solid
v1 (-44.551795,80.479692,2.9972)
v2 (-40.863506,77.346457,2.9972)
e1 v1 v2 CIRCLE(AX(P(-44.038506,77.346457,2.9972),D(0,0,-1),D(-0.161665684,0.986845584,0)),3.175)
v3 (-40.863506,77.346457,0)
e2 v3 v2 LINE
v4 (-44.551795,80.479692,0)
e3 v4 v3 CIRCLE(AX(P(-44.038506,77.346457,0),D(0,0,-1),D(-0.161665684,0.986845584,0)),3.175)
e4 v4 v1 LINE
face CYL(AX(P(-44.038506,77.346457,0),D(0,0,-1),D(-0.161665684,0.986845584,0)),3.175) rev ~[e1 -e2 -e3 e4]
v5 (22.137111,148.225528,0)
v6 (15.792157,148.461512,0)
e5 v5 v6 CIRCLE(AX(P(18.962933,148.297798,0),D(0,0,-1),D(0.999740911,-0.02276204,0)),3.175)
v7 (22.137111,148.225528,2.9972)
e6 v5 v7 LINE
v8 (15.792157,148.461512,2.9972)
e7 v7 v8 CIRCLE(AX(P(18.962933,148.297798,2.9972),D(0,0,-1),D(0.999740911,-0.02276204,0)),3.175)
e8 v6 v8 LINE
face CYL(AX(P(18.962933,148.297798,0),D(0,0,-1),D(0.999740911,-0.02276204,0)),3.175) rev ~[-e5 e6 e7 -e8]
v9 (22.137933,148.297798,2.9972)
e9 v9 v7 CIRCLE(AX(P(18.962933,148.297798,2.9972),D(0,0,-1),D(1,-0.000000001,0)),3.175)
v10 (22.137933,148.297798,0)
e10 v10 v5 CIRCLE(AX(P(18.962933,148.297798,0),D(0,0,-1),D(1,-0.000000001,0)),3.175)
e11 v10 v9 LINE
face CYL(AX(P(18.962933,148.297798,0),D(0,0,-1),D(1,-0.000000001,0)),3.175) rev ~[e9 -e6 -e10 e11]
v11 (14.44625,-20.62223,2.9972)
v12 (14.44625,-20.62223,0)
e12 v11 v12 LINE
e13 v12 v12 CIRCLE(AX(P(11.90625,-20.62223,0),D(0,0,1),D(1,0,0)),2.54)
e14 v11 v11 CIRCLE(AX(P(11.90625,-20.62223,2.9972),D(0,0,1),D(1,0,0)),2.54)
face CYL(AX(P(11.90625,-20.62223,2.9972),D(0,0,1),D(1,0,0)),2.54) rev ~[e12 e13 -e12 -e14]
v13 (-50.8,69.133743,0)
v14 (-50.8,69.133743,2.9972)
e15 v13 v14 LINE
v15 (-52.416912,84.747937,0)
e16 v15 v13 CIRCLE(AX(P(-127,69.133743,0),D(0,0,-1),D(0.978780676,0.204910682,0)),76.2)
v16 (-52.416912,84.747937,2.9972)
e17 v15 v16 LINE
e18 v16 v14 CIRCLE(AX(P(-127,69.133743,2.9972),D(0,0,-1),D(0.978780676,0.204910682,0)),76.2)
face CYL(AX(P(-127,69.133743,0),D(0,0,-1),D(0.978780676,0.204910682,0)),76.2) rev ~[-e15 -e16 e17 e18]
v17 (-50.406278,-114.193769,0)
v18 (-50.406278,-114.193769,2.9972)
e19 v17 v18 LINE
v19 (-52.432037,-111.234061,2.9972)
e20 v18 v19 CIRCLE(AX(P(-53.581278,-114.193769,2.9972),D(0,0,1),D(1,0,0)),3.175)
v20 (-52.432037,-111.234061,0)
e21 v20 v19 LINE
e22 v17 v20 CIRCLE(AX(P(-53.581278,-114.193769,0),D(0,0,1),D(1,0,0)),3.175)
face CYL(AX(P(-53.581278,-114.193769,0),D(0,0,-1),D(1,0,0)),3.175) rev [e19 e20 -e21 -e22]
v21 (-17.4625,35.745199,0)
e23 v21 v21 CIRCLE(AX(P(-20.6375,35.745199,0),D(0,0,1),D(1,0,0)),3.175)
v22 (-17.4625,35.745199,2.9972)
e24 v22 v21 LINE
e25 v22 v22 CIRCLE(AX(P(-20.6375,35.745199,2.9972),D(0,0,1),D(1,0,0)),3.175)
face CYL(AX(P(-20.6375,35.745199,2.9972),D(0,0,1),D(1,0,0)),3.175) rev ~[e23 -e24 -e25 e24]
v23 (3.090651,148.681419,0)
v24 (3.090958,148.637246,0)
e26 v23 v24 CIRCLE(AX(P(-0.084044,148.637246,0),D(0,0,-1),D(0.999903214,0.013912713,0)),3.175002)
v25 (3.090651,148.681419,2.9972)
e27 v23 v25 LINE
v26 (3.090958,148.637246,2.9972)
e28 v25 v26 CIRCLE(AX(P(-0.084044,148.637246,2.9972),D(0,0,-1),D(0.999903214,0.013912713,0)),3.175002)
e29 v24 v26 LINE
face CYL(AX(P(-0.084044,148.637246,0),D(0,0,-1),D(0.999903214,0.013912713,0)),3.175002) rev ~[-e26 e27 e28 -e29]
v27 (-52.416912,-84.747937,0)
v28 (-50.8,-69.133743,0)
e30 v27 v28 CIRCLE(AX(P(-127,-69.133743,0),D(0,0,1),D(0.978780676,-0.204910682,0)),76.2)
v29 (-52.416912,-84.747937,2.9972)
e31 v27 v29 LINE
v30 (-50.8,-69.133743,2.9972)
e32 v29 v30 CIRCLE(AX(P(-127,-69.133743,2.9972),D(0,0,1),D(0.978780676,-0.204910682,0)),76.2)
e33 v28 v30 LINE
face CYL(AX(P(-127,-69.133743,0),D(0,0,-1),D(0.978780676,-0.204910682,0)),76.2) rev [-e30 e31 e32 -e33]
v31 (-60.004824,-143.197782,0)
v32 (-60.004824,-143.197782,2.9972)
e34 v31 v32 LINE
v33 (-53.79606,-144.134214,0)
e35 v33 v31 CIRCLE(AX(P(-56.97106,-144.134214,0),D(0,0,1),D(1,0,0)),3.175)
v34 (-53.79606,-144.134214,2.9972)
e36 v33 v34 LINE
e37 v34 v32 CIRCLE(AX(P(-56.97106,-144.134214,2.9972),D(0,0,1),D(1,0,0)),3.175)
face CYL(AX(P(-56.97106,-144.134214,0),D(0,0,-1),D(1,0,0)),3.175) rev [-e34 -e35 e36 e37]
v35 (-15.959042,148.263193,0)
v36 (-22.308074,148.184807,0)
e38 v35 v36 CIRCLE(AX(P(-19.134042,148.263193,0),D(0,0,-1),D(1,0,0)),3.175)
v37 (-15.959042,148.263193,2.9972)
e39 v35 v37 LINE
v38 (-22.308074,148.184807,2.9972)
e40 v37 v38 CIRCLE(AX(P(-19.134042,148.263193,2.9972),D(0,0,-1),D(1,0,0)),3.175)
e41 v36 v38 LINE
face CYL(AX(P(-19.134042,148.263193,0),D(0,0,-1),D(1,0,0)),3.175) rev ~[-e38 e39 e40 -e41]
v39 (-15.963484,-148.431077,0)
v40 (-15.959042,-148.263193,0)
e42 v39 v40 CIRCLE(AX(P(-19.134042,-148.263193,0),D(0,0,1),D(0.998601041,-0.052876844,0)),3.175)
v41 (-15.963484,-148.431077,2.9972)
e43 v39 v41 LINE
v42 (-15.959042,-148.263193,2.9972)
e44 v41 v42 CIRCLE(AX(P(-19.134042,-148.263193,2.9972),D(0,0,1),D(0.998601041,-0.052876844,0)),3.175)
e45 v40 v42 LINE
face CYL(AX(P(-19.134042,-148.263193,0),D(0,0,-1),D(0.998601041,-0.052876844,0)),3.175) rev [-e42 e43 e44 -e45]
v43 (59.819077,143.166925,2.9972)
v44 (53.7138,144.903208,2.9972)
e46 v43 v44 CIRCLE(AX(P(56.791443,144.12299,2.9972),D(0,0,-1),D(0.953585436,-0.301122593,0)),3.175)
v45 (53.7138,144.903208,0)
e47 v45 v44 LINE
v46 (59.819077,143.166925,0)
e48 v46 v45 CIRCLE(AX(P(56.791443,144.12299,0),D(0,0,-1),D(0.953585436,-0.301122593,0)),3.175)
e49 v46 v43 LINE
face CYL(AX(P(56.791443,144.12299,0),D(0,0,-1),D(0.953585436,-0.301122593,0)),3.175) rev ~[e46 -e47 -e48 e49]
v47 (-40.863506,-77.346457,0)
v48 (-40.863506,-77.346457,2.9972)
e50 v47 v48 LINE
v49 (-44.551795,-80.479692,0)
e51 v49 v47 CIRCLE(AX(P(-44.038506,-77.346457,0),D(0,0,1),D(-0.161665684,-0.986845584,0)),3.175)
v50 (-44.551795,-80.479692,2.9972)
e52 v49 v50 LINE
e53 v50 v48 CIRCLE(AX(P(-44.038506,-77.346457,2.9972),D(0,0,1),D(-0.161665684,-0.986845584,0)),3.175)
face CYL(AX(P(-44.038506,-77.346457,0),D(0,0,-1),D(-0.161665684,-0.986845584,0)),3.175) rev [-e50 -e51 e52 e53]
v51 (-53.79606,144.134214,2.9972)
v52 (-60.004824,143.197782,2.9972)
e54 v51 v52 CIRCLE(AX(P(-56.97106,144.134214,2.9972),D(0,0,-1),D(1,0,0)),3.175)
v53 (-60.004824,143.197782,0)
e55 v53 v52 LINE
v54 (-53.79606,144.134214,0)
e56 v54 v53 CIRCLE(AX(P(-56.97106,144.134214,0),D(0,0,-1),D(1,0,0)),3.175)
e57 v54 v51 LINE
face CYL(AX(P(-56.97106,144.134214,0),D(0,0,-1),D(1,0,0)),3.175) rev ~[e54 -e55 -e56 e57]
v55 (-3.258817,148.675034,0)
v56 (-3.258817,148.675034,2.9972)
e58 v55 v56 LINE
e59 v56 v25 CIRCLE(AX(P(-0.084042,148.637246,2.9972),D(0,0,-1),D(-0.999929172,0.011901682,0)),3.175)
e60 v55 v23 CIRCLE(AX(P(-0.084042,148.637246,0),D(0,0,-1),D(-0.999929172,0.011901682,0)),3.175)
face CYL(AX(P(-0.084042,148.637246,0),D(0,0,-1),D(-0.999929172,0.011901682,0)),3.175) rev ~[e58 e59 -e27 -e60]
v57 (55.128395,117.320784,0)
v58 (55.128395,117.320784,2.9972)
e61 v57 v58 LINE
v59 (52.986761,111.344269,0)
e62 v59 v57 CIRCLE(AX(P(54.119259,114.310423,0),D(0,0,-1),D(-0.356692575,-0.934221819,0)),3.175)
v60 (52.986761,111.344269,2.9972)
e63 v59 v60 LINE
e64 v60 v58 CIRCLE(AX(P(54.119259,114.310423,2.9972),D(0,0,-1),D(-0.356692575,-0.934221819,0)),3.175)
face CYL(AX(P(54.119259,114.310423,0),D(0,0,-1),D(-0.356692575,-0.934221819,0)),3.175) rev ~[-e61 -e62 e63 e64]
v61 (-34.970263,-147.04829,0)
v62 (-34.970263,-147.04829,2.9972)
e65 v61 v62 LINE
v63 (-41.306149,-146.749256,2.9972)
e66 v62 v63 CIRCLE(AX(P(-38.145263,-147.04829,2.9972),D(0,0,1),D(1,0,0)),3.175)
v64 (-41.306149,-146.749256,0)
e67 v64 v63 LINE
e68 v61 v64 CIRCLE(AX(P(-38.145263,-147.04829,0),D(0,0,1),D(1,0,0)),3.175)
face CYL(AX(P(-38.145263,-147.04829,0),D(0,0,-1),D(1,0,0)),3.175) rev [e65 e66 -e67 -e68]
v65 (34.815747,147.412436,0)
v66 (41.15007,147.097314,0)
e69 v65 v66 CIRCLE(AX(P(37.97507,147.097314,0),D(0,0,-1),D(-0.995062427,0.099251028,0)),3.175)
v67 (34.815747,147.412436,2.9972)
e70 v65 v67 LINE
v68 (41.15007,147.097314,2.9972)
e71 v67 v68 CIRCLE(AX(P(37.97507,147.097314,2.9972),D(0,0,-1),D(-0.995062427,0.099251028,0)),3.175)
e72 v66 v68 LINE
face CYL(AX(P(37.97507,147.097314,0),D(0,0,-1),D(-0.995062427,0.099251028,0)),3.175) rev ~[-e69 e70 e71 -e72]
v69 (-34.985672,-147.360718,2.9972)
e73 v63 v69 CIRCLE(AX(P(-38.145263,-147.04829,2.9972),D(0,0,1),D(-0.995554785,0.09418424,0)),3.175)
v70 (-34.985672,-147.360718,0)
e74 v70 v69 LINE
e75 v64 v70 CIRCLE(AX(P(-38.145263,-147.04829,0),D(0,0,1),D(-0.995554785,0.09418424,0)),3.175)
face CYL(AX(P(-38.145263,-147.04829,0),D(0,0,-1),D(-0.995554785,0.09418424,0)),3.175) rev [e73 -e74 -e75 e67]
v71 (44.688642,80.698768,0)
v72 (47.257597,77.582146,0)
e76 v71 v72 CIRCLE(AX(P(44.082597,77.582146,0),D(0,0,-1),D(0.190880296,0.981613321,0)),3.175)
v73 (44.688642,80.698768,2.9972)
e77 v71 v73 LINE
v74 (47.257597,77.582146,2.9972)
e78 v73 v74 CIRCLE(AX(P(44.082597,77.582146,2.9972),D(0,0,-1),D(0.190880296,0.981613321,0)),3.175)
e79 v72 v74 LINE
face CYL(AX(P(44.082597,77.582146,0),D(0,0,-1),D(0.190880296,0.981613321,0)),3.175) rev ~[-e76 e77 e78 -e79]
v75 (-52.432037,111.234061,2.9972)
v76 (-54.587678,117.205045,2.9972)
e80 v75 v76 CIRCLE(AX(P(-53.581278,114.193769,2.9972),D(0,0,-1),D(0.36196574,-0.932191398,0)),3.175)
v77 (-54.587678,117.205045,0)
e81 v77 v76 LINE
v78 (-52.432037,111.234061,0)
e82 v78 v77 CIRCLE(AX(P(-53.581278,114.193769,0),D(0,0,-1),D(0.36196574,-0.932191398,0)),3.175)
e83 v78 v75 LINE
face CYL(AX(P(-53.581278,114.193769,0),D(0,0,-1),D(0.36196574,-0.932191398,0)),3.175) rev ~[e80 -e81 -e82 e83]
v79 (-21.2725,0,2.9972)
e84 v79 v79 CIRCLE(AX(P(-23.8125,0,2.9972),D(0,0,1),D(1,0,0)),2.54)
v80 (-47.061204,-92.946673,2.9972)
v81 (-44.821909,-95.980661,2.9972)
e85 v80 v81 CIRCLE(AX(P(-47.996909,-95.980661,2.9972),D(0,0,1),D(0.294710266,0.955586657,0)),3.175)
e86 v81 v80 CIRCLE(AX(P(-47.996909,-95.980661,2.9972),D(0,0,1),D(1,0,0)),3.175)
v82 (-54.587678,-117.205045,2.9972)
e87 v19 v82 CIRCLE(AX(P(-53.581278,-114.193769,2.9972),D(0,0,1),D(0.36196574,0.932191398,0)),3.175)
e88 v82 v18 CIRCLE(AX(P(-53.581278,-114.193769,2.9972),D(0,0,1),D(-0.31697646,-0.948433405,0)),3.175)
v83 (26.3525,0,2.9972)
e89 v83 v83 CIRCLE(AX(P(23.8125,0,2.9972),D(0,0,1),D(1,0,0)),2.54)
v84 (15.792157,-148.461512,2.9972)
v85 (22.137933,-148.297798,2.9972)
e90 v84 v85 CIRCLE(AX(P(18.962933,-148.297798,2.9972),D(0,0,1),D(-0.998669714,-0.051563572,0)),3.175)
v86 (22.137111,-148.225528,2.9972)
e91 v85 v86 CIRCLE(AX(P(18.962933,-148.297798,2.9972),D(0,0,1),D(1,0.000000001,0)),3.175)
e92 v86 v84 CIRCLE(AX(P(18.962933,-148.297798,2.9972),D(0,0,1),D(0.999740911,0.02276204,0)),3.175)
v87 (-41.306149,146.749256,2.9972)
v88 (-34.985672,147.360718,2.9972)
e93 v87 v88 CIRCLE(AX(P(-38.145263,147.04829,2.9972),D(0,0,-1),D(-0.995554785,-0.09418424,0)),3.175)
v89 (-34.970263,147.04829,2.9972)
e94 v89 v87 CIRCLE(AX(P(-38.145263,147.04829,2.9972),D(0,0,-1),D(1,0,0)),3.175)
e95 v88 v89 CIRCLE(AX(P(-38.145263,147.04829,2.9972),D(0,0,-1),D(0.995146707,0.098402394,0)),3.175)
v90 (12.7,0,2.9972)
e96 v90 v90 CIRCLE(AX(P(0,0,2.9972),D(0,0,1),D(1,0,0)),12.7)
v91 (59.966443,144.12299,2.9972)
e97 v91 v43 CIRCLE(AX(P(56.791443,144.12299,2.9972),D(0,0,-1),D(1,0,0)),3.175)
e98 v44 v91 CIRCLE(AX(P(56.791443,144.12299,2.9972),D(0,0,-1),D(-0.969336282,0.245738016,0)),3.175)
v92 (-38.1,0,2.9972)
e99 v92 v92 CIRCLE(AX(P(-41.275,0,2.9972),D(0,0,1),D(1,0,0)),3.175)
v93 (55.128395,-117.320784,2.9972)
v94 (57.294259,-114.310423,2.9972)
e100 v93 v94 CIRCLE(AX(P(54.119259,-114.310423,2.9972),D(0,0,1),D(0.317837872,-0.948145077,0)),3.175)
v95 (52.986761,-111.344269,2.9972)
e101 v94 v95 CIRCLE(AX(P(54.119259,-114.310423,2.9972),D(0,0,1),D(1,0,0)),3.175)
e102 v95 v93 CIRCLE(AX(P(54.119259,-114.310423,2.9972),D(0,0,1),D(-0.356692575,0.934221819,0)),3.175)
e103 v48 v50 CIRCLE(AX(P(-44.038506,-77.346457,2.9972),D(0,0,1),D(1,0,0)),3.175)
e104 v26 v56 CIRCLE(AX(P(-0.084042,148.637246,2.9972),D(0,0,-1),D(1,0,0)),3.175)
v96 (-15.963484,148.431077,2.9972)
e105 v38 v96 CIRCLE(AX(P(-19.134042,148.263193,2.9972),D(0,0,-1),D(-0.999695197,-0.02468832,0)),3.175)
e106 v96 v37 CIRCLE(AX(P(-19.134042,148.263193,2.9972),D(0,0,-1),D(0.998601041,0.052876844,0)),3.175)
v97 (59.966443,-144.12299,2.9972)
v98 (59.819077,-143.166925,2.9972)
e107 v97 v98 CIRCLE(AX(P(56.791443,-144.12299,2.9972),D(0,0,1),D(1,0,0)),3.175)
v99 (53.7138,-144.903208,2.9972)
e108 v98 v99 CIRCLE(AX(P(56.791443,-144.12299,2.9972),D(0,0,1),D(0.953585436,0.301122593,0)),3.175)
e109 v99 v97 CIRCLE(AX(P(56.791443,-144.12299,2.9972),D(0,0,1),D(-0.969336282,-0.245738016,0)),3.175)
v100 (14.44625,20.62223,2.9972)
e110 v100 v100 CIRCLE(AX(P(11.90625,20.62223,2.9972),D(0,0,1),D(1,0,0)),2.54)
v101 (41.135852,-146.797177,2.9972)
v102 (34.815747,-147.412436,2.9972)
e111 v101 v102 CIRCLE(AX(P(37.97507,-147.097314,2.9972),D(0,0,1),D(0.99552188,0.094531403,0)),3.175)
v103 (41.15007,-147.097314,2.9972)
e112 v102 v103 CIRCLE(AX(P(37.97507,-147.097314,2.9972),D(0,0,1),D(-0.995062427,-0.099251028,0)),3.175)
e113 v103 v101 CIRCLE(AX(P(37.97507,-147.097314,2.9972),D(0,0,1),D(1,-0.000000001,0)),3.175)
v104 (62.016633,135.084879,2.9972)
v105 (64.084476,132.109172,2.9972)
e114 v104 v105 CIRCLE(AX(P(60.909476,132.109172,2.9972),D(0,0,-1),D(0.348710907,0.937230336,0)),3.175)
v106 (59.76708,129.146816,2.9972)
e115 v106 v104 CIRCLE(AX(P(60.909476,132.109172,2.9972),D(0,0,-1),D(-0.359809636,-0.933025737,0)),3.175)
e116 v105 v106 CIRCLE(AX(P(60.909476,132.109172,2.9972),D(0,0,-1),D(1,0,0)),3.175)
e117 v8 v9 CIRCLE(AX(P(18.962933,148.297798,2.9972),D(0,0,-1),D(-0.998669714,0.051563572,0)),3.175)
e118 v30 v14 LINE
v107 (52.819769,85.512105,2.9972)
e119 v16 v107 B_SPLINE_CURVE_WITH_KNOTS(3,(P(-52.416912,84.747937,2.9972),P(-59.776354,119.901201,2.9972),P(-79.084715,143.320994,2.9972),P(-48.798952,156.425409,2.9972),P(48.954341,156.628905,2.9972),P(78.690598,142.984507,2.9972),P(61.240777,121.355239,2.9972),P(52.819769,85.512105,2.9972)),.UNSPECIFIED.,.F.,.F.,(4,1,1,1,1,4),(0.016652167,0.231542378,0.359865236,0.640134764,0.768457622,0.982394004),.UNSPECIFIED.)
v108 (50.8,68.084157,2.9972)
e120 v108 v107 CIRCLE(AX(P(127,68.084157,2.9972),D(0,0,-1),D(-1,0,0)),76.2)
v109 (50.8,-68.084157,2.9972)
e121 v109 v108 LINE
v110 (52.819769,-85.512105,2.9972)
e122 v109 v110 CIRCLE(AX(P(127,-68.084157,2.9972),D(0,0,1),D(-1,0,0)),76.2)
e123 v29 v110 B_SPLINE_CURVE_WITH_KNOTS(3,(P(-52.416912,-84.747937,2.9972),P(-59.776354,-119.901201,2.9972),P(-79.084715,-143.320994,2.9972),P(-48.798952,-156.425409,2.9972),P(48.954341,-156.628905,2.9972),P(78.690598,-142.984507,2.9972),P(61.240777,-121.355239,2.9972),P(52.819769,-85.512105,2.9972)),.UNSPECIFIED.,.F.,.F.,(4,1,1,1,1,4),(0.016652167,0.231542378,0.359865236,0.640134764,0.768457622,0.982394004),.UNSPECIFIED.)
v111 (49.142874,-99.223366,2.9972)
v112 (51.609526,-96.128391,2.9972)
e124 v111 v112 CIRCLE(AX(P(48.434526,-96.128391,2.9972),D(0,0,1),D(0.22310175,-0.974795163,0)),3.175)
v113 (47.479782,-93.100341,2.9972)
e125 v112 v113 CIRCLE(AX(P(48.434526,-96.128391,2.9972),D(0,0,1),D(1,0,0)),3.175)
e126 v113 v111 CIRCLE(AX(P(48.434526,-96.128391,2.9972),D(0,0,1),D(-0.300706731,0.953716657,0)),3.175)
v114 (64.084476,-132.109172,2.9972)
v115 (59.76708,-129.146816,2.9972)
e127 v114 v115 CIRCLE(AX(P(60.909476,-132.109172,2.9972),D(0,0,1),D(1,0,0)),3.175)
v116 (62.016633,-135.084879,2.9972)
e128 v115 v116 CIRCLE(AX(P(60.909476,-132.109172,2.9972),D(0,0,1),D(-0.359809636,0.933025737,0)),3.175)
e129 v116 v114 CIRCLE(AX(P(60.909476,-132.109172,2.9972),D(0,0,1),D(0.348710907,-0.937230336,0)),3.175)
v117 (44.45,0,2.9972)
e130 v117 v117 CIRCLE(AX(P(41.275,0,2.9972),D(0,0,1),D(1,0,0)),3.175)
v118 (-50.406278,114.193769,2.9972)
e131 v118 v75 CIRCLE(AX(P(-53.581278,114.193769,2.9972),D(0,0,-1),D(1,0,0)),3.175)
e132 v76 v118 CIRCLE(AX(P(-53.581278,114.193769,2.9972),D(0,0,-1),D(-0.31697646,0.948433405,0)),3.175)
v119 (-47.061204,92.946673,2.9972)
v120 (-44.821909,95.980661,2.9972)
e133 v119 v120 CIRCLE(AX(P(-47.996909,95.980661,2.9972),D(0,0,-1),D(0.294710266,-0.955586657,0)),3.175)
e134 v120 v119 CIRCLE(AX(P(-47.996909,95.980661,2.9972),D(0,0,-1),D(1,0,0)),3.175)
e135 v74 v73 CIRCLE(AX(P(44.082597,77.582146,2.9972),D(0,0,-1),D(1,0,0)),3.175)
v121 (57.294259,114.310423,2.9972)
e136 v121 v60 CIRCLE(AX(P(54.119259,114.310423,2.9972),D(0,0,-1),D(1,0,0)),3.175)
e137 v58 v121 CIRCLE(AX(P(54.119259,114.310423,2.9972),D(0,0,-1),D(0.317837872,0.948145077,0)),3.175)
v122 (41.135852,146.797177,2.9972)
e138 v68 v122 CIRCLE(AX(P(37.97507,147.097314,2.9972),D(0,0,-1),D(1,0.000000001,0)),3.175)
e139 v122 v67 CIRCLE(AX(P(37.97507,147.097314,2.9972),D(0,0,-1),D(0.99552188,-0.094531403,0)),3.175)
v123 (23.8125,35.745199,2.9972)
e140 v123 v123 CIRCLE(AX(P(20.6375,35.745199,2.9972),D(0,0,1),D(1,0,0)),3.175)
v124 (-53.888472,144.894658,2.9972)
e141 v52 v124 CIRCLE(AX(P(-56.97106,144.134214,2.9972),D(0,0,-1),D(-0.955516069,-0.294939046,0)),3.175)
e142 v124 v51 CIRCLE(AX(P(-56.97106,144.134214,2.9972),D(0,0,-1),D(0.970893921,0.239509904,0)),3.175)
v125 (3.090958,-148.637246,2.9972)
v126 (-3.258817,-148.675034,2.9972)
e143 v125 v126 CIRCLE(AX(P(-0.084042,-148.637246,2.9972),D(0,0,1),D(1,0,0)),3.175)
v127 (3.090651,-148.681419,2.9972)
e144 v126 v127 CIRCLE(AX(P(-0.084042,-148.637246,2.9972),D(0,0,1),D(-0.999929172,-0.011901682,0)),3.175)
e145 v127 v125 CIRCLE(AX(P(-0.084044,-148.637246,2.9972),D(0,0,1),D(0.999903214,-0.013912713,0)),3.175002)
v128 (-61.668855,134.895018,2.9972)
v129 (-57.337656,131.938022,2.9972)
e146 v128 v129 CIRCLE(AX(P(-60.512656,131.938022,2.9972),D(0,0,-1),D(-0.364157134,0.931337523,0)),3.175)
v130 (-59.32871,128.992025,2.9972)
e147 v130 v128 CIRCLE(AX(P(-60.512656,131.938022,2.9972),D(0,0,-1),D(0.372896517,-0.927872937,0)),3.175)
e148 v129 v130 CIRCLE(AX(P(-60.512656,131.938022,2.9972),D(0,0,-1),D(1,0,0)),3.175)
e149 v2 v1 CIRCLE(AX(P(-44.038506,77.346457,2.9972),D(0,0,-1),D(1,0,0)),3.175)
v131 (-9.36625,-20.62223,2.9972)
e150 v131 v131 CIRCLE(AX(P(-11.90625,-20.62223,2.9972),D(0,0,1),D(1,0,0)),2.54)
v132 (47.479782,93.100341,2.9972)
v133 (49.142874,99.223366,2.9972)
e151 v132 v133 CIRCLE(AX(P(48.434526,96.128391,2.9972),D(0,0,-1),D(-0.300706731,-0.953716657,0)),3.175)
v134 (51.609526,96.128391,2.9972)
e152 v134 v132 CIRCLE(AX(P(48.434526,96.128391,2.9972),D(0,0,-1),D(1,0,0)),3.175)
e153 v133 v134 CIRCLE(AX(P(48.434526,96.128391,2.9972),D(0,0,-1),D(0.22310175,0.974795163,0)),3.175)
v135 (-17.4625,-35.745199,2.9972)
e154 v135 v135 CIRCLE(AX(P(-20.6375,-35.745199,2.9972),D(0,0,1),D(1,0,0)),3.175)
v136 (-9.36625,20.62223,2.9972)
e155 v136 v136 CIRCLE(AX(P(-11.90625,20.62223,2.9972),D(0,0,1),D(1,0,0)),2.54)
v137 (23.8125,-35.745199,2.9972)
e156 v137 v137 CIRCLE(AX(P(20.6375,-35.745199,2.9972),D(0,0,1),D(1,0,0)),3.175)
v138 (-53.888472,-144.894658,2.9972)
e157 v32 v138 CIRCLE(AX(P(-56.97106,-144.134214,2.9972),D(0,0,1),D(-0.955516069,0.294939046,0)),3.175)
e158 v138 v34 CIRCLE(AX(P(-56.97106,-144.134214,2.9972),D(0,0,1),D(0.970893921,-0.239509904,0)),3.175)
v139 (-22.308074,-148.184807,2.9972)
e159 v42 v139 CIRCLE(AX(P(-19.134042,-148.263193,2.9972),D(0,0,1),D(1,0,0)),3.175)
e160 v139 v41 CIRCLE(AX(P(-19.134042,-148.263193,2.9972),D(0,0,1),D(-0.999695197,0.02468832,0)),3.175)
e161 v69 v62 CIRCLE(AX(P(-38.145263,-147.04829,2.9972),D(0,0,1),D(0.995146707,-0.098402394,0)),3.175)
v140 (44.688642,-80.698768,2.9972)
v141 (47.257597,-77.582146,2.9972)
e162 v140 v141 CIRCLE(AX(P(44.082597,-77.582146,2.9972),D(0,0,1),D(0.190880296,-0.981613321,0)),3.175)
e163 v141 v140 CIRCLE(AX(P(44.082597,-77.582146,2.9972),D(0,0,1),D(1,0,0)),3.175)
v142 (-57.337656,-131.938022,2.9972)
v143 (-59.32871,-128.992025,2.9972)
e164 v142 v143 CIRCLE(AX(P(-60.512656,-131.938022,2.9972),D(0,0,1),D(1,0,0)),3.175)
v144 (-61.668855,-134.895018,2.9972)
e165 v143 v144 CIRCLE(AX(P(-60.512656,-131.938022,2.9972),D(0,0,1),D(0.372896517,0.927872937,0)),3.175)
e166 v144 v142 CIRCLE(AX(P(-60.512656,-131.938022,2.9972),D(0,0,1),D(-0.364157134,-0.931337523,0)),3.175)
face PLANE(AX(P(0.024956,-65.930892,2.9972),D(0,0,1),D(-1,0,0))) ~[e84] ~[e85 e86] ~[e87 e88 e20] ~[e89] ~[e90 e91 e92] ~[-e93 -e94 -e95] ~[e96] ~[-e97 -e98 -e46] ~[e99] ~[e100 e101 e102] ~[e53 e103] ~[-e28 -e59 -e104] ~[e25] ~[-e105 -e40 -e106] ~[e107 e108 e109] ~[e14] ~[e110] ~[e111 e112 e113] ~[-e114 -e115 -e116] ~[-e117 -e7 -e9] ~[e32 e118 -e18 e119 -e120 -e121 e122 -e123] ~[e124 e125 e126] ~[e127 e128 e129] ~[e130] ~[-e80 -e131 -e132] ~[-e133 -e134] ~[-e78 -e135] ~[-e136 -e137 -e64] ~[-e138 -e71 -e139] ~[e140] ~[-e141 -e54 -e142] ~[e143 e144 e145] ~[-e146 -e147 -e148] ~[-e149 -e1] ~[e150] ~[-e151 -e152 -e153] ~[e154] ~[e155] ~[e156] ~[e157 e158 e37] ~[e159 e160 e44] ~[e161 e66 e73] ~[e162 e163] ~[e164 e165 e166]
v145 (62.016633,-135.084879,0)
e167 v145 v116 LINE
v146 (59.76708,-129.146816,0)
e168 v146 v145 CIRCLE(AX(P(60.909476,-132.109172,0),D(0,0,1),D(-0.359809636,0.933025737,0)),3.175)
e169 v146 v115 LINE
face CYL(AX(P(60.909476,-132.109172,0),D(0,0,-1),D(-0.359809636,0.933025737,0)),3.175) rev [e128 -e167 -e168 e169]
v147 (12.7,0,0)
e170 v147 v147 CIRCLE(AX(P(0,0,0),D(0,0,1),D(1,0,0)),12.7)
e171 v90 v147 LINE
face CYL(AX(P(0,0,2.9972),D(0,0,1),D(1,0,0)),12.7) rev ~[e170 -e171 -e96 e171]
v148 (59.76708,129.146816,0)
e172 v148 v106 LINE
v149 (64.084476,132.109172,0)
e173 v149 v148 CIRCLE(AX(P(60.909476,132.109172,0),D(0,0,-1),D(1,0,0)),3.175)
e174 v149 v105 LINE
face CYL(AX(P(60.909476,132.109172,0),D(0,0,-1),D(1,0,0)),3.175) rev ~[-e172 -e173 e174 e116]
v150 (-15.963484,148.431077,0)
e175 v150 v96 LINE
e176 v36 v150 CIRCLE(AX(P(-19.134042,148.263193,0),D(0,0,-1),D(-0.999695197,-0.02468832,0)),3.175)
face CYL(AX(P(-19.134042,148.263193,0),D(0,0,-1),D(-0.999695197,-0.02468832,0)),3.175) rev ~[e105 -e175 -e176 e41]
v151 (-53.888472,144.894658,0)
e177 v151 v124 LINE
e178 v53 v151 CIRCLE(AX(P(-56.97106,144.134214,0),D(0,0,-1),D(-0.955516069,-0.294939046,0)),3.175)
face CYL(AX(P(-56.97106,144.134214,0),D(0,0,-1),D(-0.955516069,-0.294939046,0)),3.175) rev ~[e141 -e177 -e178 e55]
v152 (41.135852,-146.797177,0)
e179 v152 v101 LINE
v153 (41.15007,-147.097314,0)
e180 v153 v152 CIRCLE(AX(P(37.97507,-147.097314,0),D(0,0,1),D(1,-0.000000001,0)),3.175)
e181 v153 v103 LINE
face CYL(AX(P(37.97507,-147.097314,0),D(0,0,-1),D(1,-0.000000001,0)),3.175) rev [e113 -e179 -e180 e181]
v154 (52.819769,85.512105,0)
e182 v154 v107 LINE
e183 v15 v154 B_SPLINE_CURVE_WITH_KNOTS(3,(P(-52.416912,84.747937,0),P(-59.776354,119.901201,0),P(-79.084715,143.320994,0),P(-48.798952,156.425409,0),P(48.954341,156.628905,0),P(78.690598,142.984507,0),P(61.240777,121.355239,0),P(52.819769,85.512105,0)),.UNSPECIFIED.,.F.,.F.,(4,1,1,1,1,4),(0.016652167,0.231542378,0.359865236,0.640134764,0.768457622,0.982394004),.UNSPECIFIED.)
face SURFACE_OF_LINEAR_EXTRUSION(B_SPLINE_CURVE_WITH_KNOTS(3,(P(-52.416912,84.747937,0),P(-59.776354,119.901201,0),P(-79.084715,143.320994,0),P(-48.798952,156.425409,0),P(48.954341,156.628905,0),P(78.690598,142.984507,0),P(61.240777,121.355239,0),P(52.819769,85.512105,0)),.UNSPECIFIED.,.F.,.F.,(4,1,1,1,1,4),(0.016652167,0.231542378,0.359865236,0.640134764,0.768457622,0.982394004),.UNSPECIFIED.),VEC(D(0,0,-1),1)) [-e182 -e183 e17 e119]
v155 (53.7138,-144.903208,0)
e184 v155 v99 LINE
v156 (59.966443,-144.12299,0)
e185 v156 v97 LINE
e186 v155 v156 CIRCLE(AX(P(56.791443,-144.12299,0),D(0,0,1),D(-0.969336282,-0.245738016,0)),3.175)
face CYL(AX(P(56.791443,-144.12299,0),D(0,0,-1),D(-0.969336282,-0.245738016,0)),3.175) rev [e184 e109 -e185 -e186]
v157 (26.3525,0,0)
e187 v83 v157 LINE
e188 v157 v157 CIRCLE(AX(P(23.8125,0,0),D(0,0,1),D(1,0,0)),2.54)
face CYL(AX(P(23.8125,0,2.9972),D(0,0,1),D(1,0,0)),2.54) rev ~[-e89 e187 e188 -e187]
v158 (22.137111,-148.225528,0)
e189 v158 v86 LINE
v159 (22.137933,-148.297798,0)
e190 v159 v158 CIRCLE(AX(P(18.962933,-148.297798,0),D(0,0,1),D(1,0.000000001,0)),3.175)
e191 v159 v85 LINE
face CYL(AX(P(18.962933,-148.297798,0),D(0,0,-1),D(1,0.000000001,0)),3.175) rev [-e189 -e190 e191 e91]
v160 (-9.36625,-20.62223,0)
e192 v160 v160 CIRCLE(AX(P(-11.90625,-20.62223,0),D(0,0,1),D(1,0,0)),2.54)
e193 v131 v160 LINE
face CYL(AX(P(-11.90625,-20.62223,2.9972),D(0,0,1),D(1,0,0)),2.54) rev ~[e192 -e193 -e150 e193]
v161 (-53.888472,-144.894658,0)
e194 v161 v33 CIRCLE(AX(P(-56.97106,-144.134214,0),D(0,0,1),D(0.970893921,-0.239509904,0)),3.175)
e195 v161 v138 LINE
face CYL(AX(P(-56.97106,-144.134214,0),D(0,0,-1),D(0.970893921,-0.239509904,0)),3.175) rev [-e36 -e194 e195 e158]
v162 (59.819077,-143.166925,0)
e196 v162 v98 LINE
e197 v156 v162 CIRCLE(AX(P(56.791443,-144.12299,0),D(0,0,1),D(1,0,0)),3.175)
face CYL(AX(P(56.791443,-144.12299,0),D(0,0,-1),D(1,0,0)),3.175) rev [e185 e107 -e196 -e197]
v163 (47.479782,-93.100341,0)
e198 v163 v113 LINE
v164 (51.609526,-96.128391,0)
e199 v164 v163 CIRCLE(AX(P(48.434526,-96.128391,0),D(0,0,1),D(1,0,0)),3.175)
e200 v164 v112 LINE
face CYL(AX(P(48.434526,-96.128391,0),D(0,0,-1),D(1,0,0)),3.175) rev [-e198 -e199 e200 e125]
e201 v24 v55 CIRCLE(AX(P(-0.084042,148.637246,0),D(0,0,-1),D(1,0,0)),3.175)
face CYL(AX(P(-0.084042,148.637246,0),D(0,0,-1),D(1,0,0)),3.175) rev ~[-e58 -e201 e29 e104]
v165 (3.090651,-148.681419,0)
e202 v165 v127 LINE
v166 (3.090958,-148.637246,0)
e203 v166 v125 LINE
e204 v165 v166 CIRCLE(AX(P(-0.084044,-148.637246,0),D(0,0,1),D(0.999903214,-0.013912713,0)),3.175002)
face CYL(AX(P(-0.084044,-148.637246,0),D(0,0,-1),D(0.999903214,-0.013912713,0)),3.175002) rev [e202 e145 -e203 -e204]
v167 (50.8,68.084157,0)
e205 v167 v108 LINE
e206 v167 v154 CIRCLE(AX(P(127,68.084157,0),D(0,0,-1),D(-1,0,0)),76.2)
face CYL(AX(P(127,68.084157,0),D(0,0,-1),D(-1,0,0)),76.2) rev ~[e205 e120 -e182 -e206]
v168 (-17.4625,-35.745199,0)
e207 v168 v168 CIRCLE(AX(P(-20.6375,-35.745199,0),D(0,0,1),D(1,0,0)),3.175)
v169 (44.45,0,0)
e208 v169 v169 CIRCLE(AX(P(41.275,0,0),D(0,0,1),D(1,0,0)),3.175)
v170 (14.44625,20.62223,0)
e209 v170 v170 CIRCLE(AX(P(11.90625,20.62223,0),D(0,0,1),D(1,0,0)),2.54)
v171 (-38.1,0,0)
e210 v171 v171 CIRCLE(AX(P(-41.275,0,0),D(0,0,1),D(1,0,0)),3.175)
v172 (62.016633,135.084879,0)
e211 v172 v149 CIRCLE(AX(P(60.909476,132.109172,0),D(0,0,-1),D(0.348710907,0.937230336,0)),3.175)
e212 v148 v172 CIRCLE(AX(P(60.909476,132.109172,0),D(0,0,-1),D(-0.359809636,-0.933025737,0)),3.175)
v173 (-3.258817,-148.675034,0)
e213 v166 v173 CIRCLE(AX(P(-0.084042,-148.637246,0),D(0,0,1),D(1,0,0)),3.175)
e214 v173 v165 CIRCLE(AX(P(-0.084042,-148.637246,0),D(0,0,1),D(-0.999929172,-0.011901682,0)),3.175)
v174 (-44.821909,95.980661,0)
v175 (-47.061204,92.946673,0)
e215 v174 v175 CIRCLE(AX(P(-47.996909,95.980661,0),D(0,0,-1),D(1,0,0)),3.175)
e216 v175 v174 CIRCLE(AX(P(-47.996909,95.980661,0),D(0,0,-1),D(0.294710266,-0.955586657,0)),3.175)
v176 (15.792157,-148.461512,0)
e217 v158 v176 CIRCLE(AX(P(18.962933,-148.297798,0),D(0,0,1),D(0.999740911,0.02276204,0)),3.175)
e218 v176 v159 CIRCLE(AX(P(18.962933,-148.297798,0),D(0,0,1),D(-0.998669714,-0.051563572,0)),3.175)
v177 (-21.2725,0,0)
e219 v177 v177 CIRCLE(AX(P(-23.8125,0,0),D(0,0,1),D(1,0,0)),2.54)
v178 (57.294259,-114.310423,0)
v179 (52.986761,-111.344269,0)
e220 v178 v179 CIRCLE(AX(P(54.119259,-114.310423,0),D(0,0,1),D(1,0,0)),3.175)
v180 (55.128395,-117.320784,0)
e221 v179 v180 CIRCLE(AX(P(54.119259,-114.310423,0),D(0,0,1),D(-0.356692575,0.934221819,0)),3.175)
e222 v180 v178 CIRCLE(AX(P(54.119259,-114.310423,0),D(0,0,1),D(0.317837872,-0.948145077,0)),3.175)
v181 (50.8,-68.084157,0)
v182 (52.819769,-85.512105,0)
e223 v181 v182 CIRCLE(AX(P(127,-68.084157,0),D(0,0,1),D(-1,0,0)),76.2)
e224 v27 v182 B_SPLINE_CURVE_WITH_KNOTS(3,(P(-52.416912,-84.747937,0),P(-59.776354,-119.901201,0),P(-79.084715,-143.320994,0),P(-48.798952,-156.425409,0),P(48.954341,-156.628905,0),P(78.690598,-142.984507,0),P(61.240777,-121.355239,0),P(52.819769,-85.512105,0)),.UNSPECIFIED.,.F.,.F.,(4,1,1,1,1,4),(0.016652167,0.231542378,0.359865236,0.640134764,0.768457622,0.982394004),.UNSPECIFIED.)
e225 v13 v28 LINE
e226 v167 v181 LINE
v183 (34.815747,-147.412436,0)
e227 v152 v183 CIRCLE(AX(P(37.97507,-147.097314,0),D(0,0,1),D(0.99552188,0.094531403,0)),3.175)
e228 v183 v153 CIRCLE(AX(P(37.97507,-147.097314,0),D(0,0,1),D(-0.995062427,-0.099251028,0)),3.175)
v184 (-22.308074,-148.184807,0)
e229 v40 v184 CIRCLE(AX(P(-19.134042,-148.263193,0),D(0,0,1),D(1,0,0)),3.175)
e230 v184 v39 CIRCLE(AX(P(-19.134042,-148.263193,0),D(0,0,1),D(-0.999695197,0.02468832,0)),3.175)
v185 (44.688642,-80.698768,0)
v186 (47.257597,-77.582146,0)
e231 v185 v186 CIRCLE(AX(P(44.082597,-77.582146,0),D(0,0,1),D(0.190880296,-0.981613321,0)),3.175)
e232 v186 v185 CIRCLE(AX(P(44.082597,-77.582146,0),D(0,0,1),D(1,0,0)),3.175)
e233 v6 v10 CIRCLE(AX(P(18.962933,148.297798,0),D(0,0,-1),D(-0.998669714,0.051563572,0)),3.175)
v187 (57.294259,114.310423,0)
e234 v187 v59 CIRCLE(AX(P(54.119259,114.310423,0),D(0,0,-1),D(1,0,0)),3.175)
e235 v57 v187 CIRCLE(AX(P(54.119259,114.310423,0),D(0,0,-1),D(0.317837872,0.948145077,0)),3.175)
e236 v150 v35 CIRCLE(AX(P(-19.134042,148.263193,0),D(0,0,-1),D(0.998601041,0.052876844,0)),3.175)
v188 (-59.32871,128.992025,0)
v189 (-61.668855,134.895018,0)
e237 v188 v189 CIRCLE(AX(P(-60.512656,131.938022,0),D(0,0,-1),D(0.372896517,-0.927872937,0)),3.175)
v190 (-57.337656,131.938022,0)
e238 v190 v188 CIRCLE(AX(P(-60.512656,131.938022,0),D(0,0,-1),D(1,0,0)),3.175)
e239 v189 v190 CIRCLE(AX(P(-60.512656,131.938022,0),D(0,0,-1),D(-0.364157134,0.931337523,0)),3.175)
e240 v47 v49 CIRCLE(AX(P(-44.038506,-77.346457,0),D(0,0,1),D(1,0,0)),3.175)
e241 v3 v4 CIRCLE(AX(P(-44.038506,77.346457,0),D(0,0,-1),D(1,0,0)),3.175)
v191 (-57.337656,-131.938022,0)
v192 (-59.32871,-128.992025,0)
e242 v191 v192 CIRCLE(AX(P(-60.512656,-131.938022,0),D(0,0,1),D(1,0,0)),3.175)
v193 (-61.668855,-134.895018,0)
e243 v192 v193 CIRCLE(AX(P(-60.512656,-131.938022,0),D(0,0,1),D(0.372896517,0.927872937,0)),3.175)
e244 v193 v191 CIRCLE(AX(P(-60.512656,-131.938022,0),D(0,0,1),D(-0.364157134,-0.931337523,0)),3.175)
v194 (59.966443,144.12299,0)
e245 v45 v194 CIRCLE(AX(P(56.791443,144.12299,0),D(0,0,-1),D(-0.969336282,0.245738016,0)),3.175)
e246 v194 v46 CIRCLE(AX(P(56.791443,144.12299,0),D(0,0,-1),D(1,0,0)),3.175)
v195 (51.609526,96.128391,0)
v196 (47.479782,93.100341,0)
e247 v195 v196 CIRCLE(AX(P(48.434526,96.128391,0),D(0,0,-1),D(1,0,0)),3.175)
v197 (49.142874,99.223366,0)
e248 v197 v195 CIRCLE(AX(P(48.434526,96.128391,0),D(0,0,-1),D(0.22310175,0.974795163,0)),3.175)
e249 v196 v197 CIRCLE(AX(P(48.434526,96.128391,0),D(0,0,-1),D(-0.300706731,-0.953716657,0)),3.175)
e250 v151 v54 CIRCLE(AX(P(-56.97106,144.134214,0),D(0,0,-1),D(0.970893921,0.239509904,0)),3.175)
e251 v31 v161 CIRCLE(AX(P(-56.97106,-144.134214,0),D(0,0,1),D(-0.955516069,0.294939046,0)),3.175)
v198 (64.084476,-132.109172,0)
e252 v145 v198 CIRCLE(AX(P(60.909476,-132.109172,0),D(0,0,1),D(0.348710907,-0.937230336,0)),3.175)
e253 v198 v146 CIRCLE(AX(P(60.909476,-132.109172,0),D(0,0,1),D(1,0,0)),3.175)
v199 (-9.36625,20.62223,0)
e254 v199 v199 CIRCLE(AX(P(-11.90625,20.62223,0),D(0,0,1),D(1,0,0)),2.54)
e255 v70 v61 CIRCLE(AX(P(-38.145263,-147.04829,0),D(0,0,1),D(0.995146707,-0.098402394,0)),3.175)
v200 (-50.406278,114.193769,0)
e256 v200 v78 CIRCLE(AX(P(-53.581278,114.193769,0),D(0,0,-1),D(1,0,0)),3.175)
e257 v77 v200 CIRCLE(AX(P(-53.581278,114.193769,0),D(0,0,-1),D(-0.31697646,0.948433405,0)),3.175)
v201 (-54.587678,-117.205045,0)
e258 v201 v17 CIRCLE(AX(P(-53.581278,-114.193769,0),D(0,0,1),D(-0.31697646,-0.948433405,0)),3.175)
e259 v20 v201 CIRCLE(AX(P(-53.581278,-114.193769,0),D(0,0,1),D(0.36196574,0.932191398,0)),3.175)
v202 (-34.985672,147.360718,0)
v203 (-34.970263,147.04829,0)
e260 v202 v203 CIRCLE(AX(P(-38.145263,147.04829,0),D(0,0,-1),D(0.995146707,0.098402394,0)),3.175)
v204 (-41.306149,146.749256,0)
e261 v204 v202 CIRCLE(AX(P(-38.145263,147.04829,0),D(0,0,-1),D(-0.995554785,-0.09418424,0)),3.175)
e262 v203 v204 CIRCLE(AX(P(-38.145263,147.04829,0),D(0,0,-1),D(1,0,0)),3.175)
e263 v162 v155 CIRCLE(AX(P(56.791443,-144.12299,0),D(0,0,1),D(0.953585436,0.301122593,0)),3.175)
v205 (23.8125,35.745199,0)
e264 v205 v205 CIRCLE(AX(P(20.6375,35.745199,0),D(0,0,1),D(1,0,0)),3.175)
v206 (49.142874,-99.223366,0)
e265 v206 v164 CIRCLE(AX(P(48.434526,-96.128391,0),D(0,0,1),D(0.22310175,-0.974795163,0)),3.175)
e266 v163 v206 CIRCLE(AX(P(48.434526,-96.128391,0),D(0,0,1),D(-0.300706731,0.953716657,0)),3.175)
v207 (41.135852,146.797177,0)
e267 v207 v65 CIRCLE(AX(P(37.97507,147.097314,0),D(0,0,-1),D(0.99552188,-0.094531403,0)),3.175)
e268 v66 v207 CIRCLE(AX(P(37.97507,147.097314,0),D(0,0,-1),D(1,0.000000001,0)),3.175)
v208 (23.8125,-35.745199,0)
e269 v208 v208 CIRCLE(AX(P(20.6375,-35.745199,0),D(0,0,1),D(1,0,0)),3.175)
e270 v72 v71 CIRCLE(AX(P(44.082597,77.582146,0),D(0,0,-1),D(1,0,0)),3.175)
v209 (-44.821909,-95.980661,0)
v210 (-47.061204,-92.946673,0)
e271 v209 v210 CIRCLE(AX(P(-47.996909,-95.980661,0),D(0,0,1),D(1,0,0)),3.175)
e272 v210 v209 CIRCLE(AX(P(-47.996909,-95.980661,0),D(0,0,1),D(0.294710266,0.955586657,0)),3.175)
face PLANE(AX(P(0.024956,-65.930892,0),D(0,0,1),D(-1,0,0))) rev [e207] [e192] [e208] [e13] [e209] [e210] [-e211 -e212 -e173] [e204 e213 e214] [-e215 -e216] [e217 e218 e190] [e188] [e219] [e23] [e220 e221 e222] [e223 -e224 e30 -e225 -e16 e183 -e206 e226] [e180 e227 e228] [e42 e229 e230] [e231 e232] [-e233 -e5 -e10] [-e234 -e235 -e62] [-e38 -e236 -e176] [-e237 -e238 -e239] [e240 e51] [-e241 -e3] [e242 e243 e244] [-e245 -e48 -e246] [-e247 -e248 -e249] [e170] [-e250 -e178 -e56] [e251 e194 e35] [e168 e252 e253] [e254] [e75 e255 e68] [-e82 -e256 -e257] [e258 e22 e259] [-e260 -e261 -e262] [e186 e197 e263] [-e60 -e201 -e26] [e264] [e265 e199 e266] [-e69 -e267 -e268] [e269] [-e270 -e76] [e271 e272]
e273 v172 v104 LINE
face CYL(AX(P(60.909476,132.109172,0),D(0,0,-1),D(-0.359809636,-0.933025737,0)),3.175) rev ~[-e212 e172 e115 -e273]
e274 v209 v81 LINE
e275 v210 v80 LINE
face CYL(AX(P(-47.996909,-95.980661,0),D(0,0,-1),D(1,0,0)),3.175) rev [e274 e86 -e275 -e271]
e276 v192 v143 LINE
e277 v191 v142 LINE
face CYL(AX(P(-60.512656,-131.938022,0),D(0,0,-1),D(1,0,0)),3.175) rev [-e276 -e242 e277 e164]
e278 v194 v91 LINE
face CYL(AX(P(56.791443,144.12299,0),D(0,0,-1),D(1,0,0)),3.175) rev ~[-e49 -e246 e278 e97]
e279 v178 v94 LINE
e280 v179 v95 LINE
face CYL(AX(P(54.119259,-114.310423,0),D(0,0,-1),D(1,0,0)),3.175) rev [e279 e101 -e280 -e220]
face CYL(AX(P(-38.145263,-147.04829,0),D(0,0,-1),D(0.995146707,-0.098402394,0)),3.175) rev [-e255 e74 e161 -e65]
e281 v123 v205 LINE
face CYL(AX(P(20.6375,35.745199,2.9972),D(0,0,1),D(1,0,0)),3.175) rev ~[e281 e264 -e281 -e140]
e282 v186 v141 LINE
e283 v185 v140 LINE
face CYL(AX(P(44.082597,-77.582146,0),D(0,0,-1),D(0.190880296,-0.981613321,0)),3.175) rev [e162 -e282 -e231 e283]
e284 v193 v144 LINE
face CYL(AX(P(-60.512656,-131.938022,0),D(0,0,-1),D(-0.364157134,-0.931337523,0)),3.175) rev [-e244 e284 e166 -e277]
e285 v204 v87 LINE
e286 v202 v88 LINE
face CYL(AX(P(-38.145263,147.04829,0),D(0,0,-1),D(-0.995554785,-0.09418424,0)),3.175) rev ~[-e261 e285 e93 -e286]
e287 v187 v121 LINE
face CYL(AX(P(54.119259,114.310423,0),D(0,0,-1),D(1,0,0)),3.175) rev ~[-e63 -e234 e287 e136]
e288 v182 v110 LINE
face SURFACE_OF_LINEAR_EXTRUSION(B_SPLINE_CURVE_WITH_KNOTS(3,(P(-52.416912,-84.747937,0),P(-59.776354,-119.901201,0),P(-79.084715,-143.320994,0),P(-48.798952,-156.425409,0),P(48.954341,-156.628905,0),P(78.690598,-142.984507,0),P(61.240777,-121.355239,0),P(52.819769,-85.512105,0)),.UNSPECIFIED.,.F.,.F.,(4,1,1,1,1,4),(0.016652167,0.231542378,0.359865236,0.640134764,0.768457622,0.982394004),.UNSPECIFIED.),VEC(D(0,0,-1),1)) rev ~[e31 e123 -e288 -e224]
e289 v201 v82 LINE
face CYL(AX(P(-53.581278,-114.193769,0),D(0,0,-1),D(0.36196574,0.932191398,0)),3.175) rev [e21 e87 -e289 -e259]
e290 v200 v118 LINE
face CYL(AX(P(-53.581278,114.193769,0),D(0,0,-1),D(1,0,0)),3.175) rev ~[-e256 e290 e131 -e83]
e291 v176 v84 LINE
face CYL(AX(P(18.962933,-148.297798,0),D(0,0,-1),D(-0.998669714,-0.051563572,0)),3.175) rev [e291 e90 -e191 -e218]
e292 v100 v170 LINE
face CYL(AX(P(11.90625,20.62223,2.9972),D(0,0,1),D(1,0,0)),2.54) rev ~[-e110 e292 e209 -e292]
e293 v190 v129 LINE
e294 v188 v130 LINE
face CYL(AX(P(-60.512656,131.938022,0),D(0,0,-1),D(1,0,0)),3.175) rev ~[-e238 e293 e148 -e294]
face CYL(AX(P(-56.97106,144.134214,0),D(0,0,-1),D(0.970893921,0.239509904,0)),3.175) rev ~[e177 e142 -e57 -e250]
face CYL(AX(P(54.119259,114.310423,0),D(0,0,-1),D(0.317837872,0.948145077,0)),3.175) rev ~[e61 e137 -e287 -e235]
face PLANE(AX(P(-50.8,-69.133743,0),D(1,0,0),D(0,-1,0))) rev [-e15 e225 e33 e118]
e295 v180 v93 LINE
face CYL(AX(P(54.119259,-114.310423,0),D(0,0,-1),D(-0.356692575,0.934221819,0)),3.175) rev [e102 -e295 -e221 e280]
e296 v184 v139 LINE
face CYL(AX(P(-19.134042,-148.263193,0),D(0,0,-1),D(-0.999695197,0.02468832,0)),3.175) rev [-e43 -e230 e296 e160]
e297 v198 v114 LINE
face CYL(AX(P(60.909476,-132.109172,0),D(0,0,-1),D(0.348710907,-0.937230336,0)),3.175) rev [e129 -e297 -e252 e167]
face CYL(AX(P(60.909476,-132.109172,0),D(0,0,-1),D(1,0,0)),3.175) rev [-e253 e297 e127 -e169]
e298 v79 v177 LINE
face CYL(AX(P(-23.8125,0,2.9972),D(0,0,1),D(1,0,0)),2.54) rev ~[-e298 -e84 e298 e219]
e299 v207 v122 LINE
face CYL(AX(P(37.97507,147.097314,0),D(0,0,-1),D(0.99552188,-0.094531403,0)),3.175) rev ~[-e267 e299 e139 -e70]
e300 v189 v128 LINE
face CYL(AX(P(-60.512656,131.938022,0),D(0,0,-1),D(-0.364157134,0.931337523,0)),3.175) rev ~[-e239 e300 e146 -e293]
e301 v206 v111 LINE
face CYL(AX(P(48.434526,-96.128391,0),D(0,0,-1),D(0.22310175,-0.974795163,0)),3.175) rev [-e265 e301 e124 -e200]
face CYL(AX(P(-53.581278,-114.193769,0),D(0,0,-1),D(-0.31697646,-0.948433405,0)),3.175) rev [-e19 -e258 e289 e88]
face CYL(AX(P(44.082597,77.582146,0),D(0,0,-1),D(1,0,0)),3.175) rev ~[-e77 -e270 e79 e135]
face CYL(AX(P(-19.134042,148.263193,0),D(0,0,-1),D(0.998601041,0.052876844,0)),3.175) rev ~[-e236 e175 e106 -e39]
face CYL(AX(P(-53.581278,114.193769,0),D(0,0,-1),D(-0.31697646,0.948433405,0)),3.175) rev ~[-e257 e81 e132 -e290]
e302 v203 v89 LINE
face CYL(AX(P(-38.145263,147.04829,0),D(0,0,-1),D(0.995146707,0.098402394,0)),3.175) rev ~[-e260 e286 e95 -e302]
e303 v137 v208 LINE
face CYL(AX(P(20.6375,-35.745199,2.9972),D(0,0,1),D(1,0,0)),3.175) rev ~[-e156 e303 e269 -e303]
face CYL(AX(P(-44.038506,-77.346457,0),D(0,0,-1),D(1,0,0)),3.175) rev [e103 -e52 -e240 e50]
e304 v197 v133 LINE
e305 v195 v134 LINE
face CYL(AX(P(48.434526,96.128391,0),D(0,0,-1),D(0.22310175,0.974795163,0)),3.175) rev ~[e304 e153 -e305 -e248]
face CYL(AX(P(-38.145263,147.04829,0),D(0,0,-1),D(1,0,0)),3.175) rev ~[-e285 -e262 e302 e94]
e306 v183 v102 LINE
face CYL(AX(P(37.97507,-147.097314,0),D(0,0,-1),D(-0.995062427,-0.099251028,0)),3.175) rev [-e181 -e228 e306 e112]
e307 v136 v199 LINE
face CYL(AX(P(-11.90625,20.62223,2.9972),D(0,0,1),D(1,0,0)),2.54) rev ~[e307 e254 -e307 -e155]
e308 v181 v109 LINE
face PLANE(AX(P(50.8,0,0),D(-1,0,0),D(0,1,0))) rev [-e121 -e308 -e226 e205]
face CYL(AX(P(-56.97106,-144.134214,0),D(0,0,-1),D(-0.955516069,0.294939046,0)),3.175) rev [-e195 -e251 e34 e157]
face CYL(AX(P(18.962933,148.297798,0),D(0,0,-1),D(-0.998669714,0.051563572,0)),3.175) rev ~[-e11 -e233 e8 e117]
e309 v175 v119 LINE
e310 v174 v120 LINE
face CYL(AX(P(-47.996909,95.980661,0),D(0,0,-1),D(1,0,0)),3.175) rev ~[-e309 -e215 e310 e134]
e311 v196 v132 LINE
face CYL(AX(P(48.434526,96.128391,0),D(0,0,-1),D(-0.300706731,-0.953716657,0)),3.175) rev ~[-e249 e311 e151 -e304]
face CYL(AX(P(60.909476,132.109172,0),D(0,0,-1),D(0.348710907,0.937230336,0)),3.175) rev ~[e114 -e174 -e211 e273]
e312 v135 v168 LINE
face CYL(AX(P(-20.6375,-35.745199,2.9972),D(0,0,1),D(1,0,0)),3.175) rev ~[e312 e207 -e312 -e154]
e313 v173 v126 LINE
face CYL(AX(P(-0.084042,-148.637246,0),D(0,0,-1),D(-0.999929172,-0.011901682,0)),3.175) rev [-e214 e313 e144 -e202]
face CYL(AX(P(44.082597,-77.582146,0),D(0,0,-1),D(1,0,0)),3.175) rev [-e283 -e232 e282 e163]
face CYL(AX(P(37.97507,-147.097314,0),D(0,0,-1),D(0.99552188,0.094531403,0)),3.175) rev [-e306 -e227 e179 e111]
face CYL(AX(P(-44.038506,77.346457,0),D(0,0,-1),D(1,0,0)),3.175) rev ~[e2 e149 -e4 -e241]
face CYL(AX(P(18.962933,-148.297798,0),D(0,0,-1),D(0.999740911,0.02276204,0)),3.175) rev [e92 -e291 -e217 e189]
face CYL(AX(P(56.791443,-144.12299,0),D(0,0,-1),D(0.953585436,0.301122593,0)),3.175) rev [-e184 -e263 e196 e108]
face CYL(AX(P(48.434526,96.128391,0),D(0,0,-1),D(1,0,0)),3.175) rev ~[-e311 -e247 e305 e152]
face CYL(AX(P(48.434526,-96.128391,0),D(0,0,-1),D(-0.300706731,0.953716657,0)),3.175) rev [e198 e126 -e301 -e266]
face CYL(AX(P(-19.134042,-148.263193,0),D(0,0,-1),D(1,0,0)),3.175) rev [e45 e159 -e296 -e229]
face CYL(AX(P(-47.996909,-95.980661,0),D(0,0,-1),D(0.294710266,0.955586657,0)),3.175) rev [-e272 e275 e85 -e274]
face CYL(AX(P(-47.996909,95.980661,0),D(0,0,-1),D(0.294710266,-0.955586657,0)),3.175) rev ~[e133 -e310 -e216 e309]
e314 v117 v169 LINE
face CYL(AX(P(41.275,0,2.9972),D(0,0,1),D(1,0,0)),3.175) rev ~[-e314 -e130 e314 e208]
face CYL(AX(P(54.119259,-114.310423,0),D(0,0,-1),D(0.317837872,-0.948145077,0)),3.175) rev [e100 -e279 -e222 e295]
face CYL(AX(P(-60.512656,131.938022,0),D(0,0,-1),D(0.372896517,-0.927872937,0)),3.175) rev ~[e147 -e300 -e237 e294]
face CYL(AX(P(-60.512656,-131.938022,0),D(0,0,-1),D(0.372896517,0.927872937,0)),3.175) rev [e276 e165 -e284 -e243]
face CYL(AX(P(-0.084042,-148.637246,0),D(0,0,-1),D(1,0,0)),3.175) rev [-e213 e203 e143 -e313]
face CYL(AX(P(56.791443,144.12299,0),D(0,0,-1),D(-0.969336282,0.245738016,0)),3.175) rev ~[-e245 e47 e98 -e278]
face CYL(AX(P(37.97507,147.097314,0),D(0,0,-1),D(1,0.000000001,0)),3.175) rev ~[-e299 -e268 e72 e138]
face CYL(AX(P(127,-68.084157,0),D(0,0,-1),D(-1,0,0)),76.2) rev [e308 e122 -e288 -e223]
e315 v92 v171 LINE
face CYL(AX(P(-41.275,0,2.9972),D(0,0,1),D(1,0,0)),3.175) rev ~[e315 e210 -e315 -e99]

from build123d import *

# Parameters (mm, degrees)
F1_DEPTH = 2.9972
F2_R     = 2.54
F2_R_2   = 12.7
F3_DEPTH = 2.9982001
F4_R     = 3.175
F5_DEPTH = 2.9982001


# Not quite as in the source:
# - a feature names something its author has since deleted; it is built from what else it names


with BuildPart() as f1:
    # F0 (on Top) → F1 (new body)
    with BuildSketch(Plane.XY):
        with BuildLine():
            Line((-50.8, 69.1337430724), (-50.8, 0))
            ThreePointArc((-50.8, 0), (0, -50.8), (50.8, 0))
            Line((50.8, 0), (50.8, 68.084156834))
            ThreePointArc((50.8, 68.084156834), (51.3066265414, 76.856454963), (52.8197694085, 85.5121053476))
            add(Edge.make_bspline(
                [(-52.4169124656, 84.7479370585), (-59.7763542356, 119.901201468), (-79.0847149078, 143.3209937269), (-48.7989520232, 156.4254085379), (48.9543407971, 156.6289051226), (78.6905979985, 142.9845070095), (61.240777086, 121.355239199), (52.8197694085, 85.5121053476)],
                knots=[0.016652167, 0.016652167, 0.016652167, 0.016652167, 0.2315423779, 0.3598652356, 0.6401347644, 0.7684576221, 0.9823940037, 0.9823940037, 0.9823940037, 0.9823940037], degree=3))
            ThreePointArc((-52.4169124656, 84.7479370585), (-51.205306023, 76.982587888), (-50.8, 69.1337430724))
        make_face()
        with BuildLine():
            ThreePointArc((-40.8635060245, 77.3464568111), (-46.0941000823, 74.9267134219), (-44.5517945725, 80.47969154))
            ThreePointArc((-44.5517945725, 80.47969154), (-41.9829119668, 79.7662002004), (-40.8635060245, 77.3464568111))
        make_face(mode=Mode.SUBTRACT)
        with BuildLine():
            ThreePointArc((-44.8219086152, 95.9806605486), (-45.4423549678, 94.0952214319), (-47.0612035208, 92.9466729124))
            ThreePointArc((-47.0612035208, 92.9466729124), (-51.0712627717, 95.1875833011), (-48.645629391, 99.0886802324))
            ThreePointArc((-48.645629391, 99.0886802324), (-45.9942932581, 98.444429355), (-44.8219086152, 95.9806605486))
        make_face(mode=Mode.SUBTRACT)
        with BuildLine():
            ThreePointArc((-50.4062777497, 114.1937690523), (-50.9612142113, 112.4004782074), (-52.4320365242, 111.2340613632))
            ThreePointArc((-52.4320365242, 111.2340613632), (-56.5676237816, 113.1156399423), (-54.5876780098, 117.2050451135))
            ThreePointArc((-54.5876780098, 117.2050451135), (-51.7258392336, 116.7701954365), (-50.4062777497, 114.1937690523))
        make_face(mode=Mode.SUBTRACT)
        with BuildLine():
            ThreePointArc((-57.3376559554, 131.938021535), (-57.88209946, 130.1601583445), (-59.3287095139, 128.9920249594))
            ThreePointArc((-59.3287095139, 128.9920249594), (-63.4641851685, 130.7679359381), (-61.6688548547, 134.8950181711))
            ThreePointArc((-61.6688548547, 134.8950181711), (-58.7224473789, 134.5601920582), (-57.3376559554, 131.938021535))
        make_face(mode=Mode.SUBTRACT)
        with BuildLine():
            ThreePointArc((-53.7960603193, 144.1342135781), (-56.4975490613, 140.9947212483), (-60.0048238397, 143.1977821056))
            ThreePointArc((-60.0048238397, 143.1977821056), (-57.8198491671, 147.1936551107), (-53.8884721201, 144.8946575233))
            ThreePointArc((-53.8884721201, 144.8946575233), (-53.8192479413, 144.5172328122), (-53.7960603193, 144.1342135781))
        make_face(mode=Mode.SUBTRACT)
        with BuildLine():
            ThreePointArc((-34.9702627037, 147.0482904702), (-37.995578786, 143.8768208227), (-41.3061491445, 146.7492555085))
            ThreePointArc((-41.3061491445, 146.7492555085), (-38.4509946725, 150.2085361827), (-34.9856719085, 147.3607180735))
            ThreePointArc((-34.9856719085, 147.3607180735), (-34.9741173448, 147.2046941553), (-34.9702627037, 147.0482904702))
        make_face(mode=Mode.SUBTRACT)
        with BuildLine():
            ThreePointArc((-15.9590420103, 148.2631928317), (-19.0948463149, 145.0884347783), (-22.3080742607, 148.1848074146))
            ThreePointArc((-22.3080742607, 148.1848074146), (-19.2571889586, 151.4358037169), (-15.9634837046, 148.4310768101))
            ThreePointArc((-15.9634837046, 148.4310768101), (-15.9601526281, 148.3471641942), (-15.9590420103, 148.2631928317))
        make_face(mode=Mode.SUBTRACT)
        with BuildLine():
            ThreePointArc((47.2575965607, 77.582145781), (41.6326151645, 75.5626864082), (44.6886415002, 80.6987680763))
            ThreePointArc((44.6886415002, 80.6987680763), (46.5325779568, 79.6016051539), (47.2575965607, 77.582145781))
        make_face(mode=Mode.SUBTRACT)
        with BuildLine():
            ThreePointArc((47.4797824009, 93.1003405079), (45.3705359663, 96.9606098577), (49.1428743284, 99.2233655354))
            ThreePointArc((49.1428743284, 99.2233655354), (50.9174308294, 98.1072314537), (51.6095262724, 96.1283908938))
            ThreePointArc((51.6095262724, 96.1283908938), (50.3119331553, 93.5679283583), (47.4797824009, 93.1003405079))
        make_face(mode=Mode.SUBTRACT)
        with BuildLine():
            ThreePointArc((3.0909579897, 148.6372462056), (-0.1029362656, 145.4623024254), (-3.2588171329, 148.675034047))
            ThreePointArc((-3.2588171329, 148.675034047), (-0.0872347979, 151.8122446002), (3.0906506924, 148.6814190904))
            ThreePointArc((3.0906506924, 148.6814190904), (3.0908811644, 148.6593331824), (3.0909579897, 148.6372462056))
        make_face(mode=Mode.SUBTRACT)
        with BuildLine():
            ThreePointArc((22.137110859, 148.2255283412), (18.8449293043, 145.1249914855), (15.7921571233, 148.4615121573))
            ThreePointArc((15.7921571233, 148.4615121573), (19.044817873, 151.4717417271), (22.1379334659, 148.2977978171))
            ThreePointArc((22.1379334659, 148.2977978171), (22.1377278075, 148.2616607384), (22.137110859, 148.2255283412))
        make_face(mode=Mode.SUBTRACT)
        with BuildLine():
            ThreePointArc((41.1358520444, 146.797176727), (37.6674396013, 143.9372524612), (34.8157468695, 147.4124359448))
            ThreePointArc((34.8157468695, 147.4124359448), (38.132825935, 150.2683923102), (41.1500700749, 147.0973139308))
            ThreePointArc((41.1500700749, 147.0973139308), (41.1465135754, 146.9470770399), (41.1358520444, 146.797176727))
        make_face(mode=Mode.SUBTRACT)
        with BuildLine():
            ThreePointArc((52.9867605228, 111.3442691981), (51.1303654682, 115.3814686532), (55.1283946905, 117.3207840933))
            ThreePointArc((55.1283946905, 117.3207840933), (56.6965282926, 116.1646916046), (57.294259448, 114.3104234734))
            ThreePointArc((57.294259448, 114.3104234734), (55.9199455551, 111.6954369449), (52.9867605228, 111.3442691981))
        make_face(mode=Mode.SUBTRACT)
        with BuildLine():
            ThreePointArc((59.8190768743, 143.166925299), (55.922941879, 141.0690853743), (53.7138004196, 144.9032077333))
            ThreePointArc((53.7138004196, 144.9032077333), (57.1845775976, 147.2735561917), (59.9664431146, 144.1229895318))
            ThreePointArc((59.9664431146, 144.1229895318), (59.9293852896, 143.6393120499), (59.8190768743, 143.166925299))
        make_face(mode=Mode.SUBTRACT)
        with BuildLine():
            ThreePointArc((59.7670804201, 129.1468155623), (57.9403922201, 133.2339684449), (62.0166331459, 135.0848785944))
            ThreePointArc((62.0166331459, 135.0848785944), (63.5167589772, 133.9209947171), (64.0844760149, 132.109172277))
            ThreePointArc((64.0844760149, 132.109172277), (62.7057943311, 129.4911834484), (59.7670804201, 129.1468155623))
        make_face(mode=Mode.SUBTRACT)
    extrude(amount=F1_DEPTH)

    # F2 (on face) → F3 (cut, through all)
    with BuildSketch(Plane.XY.offset(2.9972)):
        with Locations((23.8125, 0)):
            Circle(F2_R)
        with Locations((11.90625, 20.6222299276)):
            Circle(F2_R)
        with Locations((-23.8125, 0)):
            Circle(F2_R)
        with Locations((-11.90625, -20.6222299276)):
            Circle(F2_R)
        with Locations((11.90625, -20.6222299276)):
            Circle(F2_R)
        with Locations((-11.90625, 20.6222299276)):
            Circle(F2_R)
        Circle(F2_R_2)
    extrude(amount=-F3_DEPTH, mode=Mode.SUBTRACT)

    # F4 (on face) → F5 (cut, through all)
    with BuildSketch(Plane.XY.offset(2.9972)):
        with Locations((-20.6375, 35.7451985412)):
            Circle(F4_R)
        with Locations((-41.275, 0)):
            Circle(F4_R)
        with Locations((-20.6375, -35.7451985412)):
            Circle(F4_R)
        with Locations((20.6375, -35.7451985412)):
            Circle(F4_R)
        with Locations((41.275, 0)):
            Circle(F4_R)
        with Locations((20.6375, 35.7451985412)):
            Circle(F4_R)
    extrude(amount=-F5_DEPTH, mode=Mode.SUBTRACT)

    # F6: F1 across plane


with BuildPart() as f1_1:
    add(f1.part)
    add(f1.part.mirror(Plane.XZ))


solid = f1_1.part
